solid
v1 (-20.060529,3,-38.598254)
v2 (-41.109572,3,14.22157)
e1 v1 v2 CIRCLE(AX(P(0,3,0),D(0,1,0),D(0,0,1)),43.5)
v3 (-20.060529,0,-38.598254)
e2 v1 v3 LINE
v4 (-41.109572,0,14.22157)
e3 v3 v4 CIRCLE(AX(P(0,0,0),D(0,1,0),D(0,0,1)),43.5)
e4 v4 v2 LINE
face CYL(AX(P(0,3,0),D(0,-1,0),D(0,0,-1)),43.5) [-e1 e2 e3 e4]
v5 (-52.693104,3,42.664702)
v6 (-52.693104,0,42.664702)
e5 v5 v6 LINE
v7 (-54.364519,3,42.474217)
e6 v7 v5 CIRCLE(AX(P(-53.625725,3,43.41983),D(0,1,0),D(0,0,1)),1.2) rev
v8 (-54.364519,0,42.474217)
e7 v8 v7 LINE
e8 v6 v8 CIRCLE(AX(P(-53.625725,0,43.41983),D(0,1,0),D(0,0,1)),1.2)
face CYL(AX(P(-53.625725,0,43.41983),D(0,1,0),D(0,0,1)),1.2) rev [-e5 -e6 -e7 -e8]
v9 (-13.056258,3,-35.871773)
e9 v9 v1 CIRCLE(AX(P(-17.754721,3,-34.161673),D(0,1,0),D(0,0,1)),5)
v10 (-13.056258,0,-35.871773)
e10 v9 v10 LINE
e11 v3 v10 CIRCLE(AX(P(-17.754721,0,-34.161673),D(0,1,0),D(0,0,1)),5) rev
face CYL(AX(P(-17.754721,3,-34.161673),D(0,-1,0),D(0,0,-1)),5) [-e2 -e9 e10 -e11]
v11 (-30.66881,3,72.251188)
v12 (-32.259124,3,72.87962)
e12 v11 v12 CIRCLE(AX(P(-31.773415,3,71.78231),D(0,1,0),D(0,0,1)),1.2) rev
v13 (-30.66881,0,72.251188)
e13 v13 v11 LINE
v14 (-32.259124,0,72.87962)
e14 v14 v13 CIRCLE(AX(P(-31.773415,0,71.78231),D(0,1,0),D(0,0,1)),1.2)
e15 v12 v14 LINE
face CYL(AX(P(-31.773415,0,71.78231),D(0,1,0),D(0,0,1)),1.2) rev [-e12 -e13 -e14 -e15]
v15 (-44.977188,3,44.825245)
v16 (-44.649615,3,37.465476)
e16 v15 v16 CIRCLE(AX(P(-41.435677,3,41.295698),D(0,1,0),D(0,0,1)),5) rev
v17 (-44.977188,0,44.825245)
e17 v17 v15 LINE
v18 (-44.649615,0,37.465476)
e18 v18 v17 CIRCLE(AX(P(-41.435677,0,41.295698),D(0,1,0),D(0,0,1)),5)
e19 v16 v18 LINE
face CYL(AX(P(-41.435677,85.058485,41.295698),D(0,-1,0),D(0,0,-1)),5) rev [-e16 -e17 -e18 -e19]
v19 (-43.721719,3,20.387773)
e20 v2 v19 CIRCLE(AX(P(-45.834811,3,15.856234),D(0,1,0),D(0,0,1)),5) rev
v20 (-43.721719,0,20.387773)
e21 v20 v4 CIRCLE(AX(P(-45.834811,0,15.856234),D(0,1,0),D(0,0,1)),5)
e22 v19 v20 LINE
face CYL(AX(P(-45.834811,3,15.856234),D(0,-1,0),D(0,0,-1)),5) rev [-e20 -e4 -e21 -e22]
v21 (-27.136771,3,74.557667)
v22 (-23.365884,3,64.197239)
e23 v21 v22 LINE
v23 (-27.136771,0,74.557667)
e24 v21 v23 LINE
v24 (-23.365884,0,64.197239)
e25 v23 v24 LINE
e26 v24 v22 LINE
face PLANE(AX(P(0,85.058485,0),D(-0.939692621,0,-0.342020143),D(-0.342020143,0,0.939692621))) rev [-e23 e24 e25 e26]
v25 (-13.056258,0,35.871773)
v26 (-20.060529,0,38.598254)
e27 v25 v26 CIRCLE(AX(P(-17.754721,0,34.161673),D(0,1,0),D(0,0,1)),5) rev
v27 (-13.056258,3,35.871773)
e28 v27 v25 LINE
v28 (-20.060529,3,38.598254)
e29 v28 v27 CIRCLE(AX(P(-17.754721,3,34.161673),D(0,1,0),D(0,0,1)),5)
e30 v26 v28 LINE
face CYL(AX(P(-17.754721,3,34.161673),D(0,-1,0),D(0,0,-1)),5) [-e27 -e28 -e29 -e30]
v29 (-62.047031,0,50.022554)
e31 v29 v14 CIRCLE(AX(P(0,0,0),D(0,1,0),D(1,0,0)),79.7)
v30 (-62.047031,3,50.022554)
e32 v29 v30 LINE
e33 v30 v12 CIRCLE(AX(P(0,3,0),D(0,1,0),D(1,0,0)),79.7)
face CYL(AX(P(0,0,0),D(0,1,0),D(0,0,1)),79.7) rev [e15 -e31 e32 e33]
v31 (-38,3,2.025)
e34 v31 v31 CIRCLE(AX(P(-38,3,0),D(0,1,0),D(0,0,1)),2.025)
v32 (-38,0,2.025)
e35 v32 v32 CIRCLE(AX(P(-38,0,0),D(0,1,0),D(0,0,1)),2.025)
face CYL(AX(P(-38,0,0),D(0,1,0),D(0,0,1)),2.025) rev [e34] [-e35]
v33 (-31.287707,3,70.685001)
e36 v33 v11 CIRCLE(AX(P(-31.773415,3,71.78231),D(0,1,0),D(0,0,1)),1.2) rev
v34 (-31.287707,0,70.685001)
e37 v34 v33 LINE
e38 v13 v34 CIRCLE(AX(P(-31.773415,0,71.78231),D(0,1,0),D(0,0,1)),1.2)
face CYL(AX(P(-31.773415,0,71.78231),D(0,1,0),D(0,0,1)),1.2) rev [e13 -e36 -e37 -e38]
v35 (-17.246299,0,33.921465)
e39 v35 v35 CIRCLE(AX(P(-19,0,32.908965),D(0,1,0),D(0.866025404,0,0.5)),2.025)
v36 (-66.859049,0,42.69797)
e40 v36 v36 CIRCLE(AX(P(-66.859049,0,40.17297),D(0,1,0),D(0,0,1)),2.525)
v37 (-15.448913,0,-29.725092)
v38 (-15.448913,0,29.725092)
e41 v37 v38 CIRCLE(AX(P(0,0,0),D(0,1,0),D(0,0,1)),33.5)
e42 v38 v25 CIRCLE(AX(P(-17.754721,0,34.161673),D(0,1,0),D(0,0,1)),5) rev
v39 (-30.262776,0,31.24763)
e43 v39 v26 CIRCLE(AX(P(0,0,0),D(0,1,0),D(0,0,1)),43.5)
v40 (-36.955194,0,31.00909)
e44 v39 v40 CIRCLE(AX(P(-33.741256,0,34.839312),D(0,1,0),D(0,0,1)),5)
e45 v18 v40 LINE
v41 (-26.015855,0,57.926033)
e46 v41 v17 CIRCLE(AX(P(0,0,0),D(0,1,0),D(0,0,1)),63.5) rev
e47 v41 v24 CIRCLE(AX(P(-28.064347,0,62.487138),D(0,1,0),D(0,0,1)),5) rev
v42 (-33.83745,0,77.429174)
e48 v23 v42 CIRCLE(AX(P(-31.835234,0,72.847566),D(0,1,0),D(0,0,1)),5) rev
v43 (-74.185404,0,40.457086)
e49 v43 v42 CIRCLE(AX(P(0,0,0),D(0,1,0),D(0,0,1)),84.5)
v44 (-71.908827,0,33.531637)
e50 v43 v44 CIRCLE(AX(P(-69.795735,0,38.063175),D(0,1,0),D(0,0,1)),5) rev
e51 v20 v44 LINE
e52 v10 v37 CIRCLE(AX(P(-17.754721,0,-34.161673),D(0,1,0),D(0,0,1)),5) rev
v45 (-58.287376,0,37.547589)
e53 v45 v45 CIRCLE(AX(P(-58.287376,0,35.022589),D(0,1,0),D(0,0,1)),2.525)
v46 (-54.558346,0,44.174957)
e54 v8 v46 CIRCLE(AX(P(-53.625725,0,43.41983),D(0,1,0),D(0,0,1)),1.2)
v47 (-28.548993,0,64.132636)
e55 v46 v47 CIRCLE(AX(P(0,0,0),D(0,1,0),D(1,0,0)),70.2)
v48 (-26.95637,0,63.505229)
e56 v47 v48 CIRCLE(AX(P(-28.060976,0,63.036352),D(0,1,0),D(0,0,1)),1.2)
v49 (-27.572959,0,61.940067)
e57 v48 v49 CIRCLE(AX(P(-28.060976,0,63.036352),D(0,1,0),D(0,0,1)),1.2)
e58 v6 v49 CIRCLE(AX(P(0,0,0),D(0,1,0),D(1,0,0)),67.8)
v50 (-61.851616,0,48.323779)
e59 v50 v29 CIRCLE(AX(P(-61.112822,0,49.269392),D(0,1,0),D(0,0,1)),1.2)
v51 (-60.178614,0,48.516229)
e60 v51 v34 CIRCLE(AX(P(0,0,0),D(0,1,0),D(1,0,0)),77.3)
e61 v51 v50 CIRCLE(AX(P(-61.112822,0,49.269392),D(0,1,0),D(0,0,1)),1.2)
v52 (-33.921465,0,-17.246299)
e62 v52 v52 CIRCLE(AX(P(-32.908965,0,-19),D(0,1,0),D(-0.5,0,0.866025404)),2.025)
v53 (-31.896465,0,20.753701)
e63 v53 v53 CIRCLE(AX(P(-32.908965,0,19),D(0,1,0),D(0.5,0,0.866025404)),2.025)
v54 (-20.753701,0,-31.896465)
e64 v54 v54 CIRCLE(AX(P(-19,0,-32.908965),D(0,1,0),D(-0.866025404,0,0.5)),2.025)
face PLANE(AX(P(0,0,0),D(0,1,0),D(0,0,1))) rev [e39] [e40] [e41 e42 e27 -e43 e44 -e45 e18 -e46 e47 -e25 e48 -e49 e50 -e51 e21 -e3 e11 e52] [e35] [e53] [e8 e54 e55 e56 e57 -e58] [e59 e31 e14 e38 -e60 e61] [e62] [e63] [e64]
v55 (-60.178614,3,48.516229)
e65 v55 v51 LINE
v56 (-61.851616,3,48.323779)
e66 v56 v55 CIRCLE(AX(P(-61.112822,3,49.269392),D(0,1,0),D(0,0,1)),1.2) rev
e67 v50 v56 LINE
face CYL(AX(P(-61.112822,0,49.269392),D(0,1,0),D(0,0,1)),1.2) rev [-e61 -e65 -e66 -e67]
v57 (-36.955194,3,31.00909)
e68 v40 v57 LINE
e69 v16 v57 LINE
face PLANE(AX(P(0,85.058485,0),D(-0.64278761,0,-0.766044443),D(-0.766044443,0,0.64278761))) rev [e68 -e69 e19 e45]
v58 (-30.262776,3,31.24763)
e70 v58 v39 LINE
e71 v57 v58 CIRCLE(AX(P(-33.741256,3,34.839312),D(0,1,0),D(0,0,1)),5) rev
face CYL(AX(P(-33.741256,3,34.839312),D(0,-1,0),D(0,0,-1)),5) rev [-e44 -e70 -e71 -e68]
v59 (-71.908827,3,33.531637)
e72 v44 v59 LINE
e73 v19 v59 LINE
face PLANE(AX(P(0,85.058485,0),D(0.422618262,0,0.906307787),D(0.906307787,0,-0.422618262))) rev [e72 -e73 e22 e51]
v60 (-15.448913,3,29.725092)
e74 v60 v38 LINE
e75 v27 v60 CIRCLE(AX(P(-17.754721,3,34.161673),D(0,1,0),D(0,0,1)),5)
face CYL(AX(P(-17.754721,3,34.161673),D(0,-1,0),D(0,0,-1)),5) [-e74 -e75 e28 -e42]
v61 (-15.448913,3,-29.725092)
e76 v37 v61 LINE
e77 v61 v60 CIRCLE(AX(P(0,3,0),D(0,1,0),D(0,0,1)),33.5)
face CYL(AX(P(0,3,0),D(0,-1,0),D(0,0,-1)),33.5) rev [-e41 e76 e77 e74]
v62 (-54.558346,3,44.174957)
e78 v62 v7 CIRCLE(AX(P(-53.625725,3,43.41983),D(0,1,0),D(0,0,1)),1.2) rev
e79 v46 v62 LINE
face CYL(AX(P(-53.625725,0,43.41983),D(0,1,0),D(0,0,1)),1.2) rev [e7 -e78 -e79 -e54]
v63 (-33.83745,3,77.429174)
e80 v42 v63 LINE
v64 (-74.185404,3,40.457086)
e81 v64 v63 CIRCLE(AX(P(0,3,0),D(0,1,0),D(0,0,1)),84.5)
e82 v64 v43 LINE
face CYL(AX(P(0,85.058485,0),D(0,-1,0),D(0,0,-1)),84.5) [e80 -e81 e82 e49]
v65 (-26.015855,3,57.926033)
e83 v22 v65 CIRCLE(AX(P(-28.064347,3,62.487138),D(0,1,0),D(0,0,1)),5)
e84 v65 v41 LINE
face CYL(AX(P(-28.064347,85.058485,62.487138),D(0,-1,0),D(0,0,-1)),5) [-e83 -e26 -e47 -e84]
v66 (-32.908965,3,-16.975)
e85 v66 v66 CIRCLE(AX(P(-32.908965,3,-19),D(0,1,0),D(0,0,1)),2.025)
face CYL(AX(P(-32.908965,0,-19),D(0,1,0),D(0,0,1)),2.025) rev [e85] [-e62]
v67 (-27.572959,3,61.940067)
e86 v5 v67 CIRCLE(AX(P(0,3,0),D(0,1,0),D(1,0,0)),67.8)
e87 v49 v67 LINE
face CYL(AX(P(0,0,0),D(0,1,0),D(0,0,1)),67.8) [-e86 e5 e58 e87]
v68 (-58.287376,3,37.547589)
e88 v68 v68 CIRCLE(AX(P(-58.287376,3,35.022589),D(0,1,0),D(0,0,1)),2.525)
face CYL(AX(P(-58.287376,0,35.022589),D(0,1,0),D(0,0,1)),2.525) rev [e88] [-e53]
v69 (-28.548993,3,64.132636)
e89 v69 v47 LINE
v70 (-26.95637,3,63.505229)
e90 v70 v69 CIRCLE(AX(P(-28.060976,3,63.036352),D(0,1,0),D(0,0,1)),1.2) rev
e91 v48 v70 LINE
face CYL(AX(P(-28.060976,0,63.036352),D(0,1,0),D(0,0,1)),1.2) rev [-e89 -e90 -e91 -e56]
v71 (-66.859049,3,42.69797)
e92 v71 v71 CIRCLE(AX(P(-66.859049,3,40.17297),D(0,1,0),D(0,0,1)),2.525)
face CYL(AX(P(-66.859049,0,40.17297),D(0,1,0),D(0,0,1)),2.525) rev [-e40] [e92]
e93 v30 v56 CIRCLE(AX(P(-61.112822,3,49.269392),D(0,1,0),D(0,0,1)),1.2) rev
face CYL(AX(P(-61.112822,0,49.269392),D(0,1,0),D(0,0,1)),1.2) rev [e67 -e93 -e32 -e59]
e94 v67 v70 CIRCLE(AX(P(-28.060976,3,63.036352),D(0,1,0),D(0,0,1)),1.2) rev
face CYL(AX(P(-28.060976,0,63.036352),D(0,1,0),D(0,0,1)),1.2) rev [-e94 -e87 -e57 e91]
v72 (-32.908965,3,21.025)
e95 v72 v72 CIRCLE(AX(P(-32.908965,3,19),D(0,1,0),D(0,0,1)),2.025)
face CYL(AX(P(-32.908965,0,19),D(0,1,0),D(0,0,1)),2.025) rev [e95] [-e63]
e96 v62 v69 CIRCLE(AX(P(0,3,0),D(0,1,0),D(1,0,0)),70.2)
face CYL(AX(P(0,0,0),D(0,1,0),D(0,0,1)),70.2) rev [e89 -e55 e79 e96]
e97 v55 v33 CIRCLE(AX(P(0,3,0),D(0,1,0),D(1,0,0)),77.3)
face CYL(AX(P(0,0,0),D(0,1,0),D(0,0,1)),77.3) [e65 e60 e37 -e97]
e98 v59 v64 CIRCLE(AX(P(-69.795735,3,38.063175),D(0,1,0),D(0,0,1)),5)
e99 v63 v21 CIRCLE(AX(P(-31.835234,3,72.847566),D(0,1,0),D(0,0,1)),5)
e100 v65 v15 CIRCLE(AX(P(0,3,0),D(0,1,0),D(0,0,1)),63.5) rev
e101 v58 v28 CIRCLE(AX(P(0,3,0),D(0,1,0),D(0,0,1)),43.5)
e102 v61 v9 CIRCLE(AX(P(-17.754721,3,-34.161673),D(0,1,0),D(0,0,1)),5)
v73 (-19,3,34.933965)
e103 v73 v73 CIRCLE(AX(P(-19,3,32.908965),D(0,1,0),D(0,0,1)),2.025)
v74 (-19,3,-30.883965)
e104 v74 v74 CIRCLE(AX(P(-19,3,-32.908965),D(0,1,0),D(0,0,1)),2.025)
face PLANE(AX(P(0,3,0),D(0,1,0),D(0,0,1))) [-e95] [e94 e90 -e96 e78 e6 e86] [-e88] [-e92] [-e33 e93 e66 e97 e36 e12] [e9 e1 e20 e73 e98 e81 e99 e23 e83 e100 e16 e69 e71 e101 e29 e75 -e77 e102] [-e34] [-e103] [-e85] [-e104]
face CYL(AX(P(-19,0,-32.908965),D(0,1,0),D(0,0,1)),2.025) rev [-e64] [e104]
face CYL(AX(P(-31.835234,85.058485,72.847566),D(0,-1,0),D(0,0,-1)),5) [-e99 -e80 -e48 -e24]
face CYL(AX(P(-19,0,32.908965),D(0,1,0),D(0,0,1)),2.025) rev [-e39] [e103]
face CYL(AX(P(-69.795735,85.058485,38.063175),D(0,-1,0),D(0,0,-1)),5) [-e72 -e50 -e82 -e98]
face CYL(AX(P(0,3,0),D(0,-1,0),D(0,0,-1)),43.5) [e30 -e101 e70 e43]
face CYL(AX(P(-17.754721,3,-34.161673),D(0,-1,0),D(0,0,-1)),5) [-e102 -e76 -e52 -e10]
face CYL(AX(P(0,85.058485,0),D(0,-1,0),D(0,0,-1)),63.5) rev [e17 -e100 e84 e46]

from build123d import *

# Parameters (mm, degrees)
SKETCH1_R               = 43.5
SKETCH1_R_2             = 33.5
BOSS_EXTRUDE1_DEPTH     = 3
SKETCH3_R               = 2.025
CUT_EXTRUDE2_DEPTH      = 62.591395503
CIRPATTERN1_COUNT       = 12
CUT_EXTRUDE1_DEPTH      = 62.591395503
BOSS_EXTRUDE2_DEPTH     = 3
CUT_EXTRUDE_THIN1_DEPTH = 3
FILLET1_R               = 1.2
FILLET2_R               = 5
CUT_EXTRUDE3_DEPTH      = 108.998410492
CUT_EXTRUDE3_DEPTH_BACK = 108.998410492
SKETCH6_R               = 2.525


with BuildPart() as part:
    # Sketch1 → Boss-Extrude1 (new body)
    with BuildSketch(Plane(origin=(0, 0, 0), x_dir=(1, 0, 0), z_dir=(0, 1, 0))):
        with Locations(Location((0, 0, 0), (0, 0, 270))):
            Circle(SKETCH1_R)
        with Locations(Location((0, 0, 0), (0, 0, 270))):
            Circle(SKETCH1_R_2, mode=Mode.SUBTRACT)
    extrude(amount=BOSS_EXTRUDE1_DEPTH)

    # Sketch3 → Cut-Extrude2 (cut, symmetric)
    with BuildSketch(Plane(origin=(0, 3, 0), x_dir=(1, 0, 0), z_dir=(0, 1, 0))):
        with Locations(Location((-38, 0, 0), (0, 0, 270))):
            Circle(SKETCH3_R)
    cut_extrude2 = extrude(amount=CUT_EXTRUDE2_DEPTH, both=True, mode=Mode.SUBTRACT)

    # CirPattern1: Cut-Extrude2 ×12 about axis
    cirpattern1_axis = Axis((0, 0, 0), (0, 1, 0))
    for i in range(1, CIRPATTERN1_COUNT):
        add(cut_extrude2.rotate(cirpattern1_axis, i * 360 / CIRPATTERN1_COUNT), mode=Mode.SUBTRACT)

    # Sketch2 → Cut-Extrude1 (cut, symmetric)
    with BuildSketch(Plane(origin=(0, 3, 0), x_dir=(1, 0, 0), z_dir=(0, 1, 0))):
        with BuildLine():
            Line((0, 0), (43.5, 0))
            ThreePointArc((43.5, 0), (24.950574981, -35.633113927), (-14.877876235, -40.876629004))
            Line((-14.877876235, -40.876629004), (0, 0))
        make_face()
    cut_extrude1 = extrude(amount=CUT_EXTRUDE1_DEPTH, both=True, mode=Mode.SUBTRACT)

    # Mirror1: Cut-Extrude1 across plane
    add(cut_extrude1.mirror(Plane.XY), mode=Mode.SUBTRACT)

    # Sketch4 → Boss-Extrude2 (add)
    with BuildSketch(Plane(origin=(0, 0, 0), x_dir=(1, 0, 0), z_dir=(0, 1, 0))):
        with BuildLine():
            ThreePointArc((-33.322933276, -27.961261021), (-36.687527893, -23.372532963), (-39.424388736, -18.383894386))
            Line((-39.424388736, -18.383894386), (-57.550544477, -26.836259621))
            Line((-57.550544477, -26.836259621), (-76.583008005, -35.711243117))
            ThreePointArc((-76.583008005, -35.711243117), (-57.087372544, -62.29993496), (-28.900702111, -79.404026456))
            Line((-28.900702111, -79.404026456), (-21.718279101, -59.67048142))
            ThreePointArc((-21.718279101, -59.67048142), (-36.422103708, -52.016154812), (-48.643822138, -40.817013215))
            Line((-48.643822138, -40.817013215), (-33.322933276, -27.961261021))
        make_face()
    extrude(amount=BOSS_EXTRUDE2_DEPTH)

    # Sketch5 → Cut-Extrude-Thin1 (cut)
    with BuildSketch(Plane(origin=(0, 3, 0), x_dir=(1, 0, 0), z_dir=(0, 1, 0))):
        with BuildLine():
            ThreePointArc((-55.318354903, -43.219435568), (-42.735052316, -55.693404488), (-27.42932522, -64.619440712))
            Line((-27.42932522, -64.619440712), (-26.491570512, -62.410229064))
            ThreePointArc((-26.491570512, -62.410229064), (-41.274024887, -53.789356472), (-53.427129095, -41.741848027))
            Line((-53.427129095, -41.741848027), (-55.318354903, -43.219435568))
        make_face()
        with BuildLine():
            ThreePointArc((-62.804457062, -49.068219583), (-48.518285892, -63.230261221), (-31.141270941, -73.36423682))
            Line((-31.141270941, -73.36423682), (-30.203516232, -71.155025172))
            ThreePointArc((-30.203516232, -71.155025172), (-47.057258462, -61.326213205), (-60.913231254, -47.590632043))
            Line((-60.913231254, -47.590632043), (-62.804457062, -49.068219583))
        make_face()
    extrude(amount=-CUT_EXTRUDE_THIN1_DEPTH, mode=Mode.SUBTRACT)

    # Fillet1
    fillet1_edges = [part.edges().sort_by_distance(p)[0] for p in [
        (-55.318354903, 1.5, 43.219435568),
        (-62.804457062, 1.5, 49.068219583),
        (-53.427129095, 1.5, 41.741848027),
        (-60.913231254, 1.5, 47.590632043),
        (-26.491570512, 1.5, 62.410229064),
        (-30.203516232, 1.5, 71.155025172),
        (-27.42932522, 1.5, 64.619440712),
        (-31.141270941, 1.5, 73.36423682),
    ]]
    fillet(fillet1_edges, radius=FILLET1_R - 0.0001)  # a hair under: the kernel refuses the full size

    # Fillet2
    fillet2_edges = [part.edges().sort_by_distance(p)[0] for p in [
        (-14.877876235, 1.5, -40.876629004),
        (-11.457674801, 1.5, -31.479702796),
        (-11.457674801, 1.5, 31.479702796),
        (-14.877876235, 1.5, 40.876629004),
        (-39.424388736, 1.5, 18.383894386),
        (-76.583008005, 1.5, 35.711243117),
        (-28.900702111, 1.5, 79.404026456),
        (-21.718279101, 1.5, 59.67048142),
        (-33.322933276, 1.5, 27.961261021),
        (-48.643822138, 1.5, 40.817013215),
    ]]
    fillet(fillet2_edges, radius=FILLET2_R - 0.0001)  # a hair under: the kernel refuses the full size

    # Sketch6 → Cut-Extrude3 (cut, two sides: drawn at the far end of the back side and taken through both)
    with BuildSketch(Plane(origin=(0, 3, 0), x_dir=(1, 0, 0), z_dir=(0, 1, 0)).offset(-CUT_EXTRUDE3_DEPTH_BACK)):
        with Locations(Location((-58.287376448, -35.022589094, 0), (0, 0, 270))):
            Circle(SKETCH6_R)
        with Locations(Location((-66.859049455, -40.172969843, 0), (0, 0, 270))):
            Circle(SKETCH6_R)
    extrude(amount=CUT_EXTRUDE3_DEPTH + CUT_EXTRUDE3_DEPTH_BACK, mode=Mode.SUBTRACT)


solid = part.part
